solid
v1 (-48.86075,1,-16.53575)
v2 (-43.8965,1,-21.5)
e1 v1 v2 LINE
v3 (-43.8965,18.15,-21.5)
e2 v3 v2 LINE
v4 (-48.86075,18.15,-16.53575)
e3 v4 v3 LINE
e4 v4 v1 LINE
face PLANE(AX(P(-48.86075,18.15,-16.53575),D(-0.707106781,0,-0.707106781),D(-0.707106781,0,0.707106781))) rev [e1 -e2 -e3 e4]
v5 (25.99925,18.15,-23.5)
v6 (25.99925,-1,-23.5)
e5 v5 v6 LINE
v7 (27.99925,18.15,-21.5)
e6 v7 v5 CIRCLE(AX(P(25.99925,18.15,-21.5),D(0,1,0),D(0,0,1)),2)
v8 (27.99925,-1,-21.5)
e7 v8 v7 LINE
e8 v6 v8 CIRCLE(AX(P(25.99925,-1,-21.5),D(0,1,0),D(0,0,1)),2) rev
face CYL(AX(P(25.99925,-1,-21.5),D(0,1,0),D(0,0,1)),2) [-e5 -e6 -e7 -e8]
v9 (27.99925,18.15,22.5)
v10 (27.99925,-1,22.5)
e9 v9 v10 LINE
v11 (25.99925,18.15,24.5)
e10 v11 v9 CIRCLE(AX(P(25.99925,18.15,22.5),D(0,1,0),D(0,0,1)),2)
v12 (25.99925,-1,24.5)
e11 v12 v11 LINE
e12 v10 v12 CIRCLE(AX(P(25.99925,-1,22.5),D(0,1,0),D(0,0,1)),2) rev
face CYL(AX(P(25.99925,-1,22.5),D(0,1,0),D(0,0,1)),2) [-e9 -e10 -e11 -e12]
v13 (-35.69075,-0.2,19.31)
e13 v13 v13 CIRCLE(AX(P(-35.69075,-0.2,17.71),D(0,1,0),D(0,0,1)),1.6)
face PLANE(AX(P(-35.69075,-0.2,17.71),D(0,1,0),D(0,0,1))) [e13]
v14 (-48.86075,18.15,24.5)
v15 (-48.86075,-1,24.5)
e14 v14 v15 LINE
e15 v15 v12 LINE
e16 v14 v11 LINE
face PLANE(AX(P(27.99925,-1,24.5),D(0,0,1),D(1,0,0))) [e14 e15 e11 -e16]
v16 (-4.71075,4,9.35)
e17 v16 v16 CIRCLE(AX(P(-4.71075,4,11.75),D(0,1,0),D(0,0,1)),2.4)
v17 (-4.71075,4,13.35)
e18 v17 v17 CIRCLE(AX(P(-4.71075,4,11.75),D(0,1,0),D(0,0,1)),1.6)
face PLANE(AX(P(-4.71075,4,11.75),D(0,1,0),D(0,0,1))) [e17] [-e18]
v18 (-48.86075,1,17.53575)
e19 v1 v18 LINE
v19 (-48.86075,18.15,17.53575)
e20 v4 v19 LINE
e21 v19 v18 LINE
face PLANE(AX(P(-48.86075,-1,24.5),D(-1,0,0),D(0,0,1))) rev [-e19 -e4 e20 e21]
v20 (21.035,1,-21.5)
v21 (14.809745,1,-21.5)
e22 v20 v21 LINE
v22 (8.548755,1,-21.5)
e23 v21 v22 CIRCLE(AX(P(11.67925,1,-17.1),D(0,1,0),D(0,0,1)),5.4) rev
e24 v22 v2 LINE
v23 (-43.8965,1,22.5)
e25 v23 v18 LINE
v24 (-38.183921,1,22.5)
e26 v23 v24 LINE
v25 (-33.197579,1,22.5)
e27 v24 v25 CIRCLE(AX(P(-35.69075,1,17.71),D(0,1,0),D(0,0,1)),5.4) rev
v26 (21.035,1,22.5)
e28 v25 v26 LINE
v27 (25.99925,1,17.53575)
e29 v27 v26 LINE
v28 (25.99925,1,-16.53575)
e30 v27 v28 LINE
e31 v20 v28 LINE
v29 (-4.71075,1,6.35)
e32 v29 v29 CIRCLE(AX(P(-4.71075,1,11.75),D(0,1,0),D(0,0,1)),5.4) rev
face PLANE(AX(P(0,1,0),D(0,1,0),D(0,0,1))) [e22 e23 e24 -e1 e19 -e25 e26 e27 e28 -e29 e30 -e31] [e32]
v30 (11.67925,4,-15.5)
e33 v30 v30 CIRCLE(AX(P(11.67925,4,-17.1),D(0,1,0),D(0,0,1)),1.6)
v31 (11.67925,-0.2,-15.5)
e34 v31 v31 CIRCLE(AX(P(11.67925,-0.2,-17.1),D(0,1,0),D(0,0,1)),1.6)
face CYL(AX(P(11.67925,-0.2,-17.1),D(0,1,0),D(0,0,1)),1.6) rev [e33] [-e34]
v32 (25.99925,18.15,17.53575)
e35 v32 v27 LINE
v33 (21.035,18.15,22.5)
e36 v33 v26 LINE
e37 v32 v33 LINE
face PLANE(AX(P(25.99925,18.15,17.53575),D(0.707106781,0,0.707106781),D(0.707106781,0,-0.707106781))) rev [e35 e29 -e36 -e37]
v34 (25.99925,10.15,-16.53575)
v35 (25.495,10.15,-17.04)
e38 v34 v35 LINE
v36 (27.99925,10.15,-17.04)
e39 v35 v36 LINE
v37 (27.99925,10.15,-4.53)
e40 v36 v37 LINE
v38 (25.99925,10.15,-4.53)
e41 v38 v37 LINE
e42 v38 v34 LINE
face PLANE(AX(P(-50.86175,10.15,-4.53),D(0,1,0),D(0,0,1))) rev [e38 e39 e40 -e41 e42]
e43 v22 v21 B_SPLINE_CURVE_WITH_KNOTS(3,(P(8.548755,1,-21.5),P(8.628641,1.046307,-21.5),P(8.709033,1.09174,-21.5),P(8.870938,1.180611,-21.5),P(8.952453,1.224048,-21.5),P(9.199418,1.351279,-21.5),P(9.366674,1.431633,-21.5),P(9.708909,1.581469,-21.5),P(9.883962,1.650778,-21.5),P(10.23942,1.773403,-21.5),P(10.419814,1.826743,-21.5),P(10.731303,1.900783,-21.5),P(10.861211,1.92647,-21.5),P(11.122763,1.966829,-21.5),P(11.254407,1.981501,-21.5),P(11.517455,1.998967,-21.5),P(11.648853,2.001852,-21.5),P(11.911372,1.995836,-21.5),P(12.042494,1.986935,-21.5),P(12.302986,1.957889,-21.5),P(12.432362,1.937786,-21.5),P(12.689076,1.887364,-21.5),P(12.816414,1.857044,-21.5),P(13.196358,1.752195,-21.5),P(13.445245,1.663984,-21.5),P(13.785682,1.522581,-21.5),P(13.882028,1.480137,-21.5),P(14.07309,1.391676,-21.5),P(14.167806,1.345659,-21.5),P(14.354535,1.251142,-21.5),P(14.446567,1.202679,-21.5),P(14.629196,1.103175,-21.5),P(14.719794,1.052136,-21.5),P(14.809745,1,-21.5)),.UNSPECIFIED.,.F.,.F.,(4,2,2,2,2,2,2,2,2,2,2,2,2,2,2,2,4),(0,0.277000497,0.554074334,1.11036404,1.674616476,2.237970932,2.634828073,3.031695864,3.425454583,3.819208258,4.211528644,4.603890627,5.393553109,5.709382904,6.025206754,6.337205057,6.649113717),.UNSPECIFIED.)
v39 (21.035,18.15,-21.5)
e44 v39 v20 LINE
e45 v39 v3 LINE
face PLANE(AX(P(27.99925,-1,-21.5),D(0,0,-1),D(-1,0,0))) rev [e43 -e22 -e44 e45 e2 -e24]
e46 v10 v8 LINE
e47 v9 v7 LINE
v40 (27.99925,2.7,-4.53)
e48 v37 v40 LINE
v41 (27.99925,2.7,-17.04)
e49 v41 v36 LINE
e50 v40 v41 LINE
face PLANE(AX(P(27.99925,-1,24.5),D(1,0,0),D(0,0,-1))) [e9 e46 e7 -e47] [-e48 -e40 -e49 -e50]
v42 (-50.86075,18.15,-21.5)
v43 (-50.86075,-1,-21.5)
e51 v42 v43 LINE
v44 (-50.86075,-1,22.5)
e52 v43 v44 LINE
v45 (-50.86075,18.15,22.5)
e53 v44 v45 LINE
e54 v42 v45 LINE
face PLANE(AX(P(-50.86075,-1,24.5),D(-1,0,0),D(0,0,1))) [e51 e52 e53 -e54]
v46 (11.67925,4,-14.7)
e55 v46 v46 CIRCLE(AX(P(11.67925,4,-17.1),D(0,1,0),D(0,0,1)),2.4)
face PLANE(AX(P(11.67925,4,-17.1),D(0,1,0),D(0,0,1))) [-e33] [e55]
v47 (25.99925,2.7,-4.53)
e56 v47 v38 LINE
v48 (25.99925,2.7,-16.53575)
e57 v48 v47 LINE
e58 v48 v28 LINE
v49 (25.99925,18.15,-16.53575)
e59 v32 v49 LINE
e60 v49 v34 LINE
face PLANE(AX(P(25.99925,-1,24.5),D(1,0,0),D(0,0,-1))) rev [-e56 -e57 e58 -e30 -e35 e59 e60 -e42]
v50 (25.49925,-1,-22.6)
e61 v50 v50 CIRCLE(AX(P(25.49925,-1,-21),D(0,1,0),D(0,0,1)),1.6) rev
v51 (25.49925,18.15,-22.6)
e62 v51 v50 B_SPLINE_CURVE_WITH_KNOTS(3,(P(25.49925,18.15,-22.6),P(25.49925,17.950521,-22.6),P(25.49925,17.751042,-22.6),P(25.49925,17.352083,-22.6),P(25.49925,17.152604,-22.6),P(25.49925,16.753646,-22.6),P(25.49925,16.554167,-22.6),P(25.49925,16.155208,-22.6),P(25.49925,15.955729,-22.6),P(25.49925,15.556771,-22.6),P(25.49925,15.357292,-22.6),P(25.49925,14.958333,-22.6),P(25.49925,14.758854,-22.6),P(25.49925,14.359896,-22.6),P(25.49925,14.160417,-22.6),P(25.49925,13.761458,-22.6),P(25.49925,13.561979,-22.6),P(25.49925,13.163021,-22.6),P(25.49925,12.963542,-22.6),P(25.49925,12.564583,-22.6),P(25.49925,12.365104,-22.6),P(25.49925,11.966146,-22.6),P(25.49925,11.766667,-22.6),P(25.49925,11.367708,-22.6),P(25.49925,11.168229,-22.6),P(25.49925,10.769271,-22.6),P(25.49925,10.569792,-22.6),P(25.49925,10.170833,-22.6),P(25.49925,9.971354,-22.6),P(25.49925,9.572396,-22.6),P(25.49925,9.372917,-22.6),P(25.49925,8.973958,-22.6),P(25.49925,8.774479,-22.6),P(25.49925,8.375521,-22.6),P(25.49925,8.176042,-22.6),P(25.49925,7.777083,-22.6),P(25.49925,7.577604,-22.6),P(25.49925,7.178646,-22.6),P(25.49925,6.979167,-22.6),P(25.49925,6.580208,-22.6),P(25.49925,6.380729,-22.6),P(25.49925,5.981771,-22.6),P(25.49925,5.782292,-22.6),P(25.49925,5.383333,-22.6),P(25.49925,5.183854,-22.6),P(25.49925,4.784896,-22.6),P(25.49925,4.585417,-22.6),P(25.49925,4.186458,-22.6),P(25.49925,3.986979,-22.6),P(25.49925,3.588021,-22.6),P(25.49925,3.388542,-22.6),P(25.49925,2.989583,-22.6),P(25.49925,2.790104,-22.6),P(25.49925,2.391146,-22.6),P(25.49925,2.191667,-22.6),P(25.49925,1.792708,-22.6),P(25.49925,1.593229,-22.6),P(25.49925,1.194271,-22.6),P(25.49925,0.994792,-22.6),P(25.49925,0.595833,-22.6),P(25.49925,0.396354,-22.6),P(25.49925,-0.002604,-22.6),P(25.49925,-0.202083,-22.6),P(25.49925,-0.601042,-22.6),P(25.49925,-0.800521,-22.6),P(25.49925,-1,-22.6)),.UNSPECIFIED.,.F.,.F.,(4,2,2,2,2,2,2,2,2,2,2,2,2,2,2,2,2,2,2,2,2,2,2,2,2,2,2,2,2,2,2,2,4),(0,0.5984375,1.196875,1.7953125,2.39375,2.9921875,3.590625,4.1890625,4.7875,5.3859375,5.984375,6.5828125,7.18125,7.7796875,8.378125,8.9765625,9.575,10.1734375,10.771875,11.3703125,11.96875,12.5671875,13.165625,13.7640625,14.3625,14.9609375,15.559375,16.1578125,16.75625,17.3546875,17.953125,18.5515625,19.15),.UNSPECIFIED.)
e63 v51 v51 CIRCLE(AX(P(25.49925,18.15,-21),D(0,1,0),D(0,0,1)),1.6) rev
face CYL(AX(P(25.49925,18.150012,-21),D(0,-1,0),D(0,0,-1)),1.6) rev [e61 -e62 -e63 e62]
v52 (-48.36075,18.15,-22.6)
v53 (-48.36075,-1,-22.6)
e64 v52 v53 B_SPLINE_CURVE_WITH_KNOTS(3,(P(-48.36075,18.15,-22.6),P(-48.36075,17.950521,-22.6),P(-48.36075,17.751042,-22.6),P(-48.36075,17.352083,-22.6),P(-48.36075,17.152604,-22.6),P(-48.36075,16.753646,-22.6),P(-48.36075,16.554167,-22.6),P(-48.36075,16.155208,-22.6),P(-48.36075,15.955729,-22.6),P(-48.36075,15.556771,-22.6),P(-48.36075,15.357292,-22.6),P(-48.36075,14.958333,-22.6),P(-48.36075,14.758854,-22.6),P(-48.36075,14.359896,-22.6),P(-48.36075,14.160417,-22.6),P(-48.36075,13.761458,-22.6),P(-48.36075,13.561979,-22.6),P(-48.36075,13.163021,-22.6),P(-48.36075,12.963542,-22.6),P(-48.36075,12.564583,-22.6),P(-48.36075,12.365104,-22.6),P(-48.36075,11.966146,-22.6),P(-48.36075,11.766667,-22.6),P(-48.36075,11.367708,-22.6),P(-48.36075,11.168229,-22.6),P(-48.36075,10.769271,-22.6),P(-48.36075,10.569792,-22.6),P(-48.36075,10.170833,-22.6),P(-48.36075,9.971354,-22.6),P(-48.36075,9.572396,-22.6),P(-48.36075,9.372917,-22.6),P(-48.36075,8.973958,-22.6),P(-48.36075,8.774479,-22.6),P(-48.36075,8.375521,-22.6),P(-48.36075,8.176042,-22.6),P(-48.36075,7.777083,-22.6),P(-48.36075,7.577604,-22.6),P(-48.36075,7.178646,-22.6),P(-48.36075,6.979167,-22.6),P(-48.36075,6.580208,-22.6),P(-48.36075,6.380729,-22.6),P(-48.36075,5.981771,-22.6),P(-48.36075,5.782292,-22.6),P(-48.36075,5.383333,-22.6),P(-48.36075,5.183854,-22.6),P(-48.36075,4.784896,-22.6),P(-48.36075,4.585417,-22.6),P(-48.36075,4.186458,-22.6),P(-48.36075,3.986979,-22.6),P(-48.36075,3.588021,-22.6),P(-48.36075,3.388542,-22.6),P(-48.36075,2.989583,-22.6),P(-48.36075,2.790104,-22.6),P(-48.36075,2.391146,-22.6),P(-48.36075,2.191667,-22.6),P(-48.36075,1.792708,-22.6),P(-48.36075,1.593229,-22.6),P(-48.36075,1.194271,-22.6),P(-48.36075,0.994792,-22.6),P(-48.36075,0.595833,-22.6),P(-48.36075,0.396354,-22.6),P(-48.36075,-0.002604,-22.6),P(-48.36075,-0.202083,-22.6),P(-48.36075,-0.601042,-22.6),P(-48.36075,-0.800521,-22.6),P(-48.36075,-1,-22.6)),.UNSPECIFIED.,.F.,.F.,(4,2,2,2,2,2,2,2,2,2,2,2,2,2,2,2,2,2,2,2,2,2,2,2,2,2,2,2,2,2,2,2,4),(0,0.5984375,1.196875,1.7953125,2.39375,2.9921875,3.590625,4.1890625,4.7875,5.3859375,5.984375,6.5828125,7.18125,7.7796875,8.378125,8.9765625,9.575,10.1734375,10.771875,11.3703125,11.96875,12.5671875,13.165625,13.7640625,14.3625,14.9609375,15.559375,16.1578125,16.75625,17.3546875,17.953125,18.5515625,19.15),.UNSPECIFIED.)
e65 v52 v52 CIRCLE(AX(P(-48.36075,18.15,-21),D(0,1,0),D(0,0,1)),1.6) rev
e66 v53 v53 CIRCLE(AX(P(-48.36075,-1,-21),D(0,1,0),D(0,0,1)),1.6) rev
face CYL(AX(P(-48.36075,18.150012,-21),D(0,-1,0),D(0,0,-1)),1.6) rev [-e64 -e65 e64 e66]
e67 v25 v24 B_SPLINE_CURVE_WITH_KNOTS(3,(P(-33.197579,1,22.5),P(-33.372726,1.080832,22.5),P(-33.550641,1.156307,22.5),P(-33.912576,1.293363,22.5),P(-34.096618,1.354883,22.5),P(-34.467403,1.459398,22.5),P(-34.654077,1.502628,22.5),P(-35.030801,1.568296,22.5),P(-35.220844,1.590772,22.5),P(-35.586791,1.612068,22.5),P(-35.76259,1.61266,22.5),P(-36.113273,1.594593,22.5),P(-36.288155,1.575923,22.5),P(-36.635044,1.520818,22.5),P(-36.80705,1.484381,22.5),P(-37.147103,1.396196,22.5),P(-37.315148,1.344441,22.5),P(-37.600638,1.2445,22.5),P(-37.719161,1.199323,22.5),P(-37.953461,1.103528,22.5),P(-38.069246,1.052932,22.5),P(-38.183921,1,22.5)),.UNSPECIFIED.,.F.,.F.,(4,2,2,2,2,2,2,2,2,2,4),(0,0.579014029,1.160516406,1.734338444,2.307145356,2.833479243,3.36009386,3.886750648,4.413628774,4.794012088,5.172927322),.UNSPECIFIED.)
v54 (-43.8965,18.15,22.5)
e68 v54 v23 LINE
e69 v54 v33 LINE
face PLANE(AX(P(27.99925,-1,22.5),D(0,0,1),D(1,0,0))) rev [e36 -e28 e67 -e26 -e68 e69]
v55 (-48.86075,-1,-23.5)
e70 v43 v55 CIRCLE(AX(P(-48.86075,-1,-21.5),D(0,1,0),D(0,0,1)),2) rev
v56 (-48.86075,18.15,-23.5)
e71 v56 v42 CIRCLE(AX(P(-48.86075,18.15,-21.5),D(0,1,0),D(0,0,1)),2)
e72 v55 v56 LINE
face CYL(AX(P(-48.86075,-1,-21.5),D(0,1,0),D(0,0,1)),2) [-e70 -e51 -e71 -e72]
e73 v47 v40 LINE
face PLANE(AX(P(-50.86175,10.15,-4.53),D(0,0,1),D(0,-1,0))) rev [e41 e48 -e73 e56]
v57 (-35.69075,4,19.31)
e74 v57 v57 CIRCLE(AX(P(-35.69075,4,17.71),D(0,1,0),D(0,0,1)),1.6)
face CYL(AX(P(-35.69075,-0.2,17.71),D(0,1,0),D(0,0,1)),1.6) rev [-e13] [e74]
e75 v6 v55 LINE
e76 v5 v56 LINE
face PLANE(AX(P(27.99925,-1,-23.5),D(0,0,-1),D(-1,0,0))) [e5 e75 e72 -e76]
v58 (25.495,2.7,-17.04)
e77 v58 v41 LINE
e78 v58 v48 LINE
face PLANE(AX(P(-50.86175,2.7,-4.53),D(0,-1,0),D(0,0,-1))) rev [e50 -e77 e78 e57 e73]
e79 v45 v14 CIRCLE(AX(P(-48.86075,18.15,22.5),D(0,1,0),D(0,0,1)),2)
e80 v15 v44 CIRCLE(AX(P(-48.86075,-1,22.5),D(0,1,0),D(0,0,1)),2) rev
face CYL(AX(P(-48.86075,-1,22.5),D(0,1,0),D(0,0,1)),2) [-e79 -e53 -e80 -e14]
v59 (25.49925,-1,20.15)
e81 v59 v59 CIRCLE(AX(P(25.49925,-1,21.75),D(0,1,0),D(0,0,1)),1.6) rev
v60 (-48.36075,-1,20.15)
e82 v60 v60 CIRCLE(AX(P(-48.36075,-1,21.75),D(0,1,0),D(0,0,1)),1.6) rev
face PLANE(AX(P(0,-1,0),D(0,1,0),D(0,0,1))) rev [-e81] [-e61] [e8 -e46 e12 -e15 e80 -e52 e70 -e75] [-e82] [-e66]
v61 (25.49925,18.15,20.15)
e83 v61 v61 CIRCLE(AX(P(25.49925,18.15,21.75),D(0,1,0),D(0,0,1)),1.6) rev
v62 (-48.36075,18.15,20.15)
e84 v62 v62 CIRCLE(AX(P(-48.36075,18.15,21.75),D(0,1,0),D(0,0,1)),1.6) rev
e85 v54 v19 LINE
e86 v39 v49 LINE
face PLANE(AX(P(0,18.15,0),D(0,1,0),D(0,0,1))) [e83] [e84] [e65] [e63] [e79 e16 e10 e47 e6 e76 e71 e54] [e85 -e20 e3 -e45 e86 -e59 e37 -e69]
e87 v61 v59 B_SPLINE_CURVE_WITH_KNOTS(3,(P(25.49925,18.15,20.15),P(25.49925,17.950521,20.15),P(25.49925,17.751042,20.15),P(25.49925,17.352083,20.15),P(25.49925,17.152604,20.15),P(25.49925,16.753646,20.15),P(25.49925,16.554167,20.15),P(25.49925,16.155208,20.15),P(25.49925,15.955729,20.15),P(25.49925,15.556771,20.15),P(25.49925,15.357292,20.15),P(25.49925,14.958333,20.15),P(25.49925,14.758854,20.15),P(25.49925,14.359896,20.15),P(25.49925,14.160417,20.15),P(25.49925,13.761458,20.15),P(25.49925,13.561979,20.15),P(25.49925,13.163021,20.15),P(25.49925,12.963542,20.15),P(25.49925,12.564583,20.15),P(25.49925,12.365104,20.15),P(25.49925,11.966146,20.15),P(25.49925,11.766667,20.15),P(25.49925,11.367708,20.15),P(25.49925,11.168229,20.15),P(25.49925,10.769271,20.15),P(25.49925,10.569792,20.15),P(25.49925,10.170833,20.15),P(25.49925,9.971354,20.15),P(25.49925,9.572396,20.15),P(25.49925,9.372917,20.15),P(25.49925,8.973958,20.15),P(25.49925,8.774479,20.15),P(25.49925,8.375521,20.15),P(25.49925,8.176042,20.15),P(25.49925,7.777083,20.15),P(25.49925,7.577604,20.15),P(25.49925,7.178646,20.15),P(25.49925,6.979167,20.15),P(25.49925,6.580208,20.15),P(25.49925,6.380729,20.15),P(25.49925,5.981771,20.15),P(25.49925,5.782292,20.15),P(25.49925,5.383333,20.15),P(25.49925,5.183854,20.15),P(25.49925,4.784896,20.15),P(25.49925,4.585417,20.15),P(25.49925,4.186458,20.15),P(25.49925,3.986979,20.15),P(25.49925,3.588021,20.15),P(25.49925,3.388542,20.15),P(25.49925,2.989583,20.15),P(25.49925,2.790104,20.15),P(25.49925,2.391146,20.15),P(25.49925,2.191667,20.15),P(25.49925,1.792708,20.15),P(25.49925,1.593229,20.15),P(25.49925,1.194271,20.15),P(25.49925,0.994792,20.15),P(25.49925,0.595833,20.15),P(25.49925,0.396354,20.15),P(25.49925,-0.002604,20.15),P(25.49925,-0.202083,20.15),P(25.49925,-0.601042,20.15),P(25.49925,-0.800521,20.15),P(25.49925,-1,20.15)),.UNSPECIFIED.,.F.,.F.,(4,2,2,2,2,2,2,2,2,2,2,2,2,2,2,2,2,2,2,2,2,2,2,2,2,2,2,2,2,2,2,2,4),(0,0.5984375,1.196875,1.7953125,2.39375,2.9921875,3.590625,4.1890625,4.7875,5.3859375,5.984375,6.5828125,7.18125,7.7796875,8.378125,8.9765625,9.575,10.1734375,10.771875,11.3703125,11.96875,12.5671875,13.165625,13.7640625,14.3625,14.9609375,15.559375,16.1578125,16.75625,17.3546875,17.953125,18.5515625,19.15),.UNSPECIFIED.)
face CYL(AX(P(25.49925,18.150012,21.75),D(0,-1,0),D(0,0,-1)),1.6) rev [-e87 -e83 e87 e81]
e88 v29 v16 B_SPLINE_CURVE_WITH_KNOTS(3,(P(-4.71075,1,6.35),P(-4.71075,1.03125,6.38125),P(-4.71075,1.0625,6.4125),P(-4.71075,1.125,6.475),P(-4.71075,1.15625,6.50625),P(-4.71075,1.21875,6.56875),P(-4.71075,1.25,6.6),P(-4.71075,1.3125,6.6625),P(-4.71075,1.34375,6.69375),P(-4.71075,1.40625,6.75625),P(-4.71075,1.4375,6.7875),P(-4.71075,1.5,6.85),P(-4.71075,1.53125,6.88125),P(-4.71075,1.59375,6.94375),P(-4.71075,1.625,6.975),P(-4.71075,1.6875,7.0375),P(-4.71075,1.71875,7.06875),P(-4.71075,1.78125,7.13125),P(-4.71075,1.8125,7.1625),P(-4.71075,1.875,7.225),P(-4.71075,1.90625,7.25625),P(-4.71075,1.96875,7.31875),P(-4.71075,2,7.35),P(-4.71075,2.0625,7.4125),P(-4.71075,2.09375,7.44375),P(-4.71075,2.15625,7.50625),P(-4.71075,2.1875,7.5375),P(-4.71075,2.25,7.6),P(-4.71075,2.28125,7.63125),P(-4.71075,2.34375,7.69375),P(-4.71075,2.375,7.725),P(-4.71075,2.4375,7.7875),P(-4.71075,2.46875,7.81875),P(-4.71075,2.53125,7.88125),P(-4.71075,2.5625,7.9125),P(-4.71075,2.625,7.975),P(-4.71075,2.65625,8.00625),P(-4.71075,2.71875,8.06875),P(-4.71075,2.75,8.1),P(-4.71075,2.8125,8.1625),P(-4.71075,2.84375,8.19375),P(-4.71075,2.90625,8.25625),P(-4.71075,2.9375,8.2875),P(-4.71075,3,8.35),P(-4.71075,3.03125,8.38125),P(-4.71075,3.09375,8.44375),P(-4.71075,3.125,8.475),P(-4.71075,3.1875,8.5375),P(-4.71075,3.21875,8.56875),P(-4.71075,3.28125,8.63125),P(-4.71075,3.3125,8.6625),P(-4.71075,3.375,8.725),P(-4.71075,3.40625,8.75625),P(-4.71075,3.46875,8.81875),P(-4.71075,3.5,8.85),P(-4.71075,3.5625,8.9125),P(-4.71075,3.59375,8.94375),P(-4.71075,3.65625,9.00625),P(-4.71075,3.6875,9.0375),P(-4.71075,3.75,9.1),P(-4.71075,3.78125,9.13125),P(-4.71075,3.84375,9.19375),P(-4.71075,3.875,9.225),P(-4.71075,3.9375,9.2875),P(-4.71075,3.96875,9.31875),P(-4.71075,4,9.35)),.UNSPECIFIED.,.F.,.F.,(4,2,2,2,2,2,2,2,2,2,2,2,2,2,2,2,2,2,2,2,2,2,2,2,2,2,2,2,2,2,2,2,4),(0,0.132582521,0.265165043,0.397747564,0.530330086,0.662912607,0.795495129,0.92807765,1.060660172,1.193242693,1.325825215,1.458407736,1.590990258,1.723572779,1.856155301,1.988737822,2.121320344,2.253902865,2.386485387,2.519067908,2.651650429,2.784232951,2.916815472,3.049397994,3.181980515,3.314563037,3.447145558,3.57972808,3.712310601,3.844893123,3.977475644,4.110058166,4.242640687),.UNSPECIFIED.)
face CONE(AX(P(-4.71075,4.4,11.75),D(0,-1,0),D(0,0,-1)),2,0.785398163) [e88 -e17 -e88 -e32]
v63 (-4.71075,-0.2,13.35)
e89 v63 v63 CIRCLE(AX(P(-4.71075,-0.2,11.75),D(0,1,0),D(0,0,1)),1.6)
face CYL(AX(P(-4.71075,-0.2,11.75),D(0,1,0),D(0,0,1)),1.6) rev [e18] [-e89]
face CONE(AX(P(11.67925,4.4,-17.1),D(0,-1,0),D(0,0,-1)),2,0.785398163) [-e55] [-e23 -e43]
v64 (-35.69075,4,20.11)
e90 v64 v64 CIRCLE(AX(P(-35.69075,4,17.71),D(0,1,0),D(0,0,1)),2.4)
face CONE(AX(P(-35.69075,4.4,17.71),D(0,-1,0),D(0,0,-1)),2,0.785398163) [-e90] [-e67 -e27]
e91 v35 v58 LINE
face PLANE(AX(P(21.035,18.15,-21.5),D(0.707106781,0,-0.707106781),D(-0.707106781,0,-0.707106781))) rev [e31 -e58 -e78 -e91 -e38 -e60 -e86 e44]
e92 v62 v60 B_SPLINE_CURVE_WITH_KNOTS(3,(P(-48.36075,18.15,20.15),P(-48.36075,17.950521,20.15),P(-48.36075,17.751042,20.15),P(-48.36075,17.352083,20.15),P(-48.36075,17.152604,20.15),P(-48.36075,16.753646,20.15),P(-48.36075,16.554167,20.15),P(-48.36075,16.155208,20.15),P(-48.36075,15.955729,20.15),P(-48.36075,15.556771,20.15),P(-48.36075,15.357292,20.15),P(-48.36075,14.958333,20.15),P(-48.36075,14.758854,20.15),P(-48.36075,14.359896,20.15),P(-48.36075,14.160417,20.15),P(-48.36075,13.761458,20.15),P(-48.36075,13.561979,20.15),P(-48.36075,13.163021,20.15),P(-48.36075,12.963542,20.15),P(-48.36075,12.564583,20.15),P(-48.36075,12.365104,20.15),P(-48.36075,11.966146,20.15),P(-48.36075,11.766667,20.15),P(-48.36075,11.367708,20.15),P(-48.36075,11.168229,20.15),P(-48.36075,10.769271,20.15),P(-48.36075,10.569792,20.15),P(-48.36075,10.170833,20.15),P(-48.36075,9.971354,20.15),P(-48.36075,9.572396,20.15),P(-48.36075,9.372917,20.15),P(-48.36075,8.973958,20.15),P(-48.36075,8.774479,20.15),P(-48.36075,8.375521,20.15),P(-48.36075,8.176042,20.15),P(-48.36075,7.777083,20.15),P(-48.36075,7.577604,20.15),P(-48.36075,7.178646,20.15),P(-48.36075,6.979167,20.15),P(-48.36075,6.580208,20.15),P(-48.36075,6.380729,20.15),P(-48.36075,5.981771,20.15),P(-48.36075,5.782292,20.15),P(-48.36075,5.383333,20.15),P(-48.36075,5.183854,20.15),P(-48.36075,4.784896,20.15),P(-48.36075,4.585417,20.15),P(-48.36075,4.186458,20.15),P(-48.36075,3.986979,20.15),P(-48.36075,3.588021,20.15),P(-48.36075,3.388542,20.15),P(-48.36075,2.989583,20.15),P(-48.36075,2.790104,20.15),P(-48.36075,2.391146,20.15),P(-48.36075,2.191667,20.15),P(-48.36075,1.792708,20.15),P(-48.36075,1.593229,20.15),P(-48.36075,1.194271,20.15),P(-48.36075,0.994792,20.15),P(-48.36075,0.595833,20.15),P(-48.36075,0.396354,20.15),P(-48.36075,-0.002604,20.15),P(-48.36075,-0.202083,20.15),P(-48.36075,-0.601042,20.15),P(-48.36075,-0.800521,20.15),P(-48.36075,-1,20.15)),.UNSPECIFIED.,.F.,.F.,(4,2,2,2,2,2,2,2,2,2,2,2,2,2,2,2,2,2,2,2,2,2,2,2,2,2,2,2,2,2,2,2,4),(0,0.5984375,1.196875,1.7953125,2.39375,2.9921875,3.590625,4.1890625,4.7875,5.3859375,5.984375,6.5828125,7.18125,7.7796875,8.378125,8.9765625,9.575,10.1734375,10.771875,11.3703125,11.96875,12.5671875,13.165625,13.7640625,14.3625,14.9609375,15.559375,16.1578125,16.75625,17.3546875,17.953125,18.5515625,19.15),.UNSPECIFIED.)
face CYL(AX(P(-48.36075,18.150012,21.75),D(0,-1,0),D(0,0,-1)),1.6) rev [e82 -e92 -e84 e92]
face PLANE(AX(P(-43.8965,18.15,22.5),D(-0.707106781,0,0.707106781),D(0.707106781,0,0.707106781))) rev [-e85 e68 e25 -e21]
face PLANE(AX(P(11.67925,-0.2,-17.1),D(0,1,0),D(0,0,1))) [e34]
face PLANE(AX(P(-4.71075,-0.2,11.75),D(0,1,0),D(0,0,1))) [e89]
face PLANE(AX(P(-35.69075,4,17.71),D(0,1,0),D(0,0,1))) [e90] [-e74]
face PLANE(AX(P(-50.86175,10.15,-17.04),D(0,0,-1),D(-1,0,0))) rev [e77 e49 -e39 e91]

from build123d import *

# Parameters (mm, degrees)
BOSS_EXTRUDE1_DEPTH      = 18.15
BOSS_EXTRUDE1_DEPTH_BACK = 1
SKETCH1_W                = 78.86
SKETCH1_H                = 48
SHELL1_T                 = -2
BOSS_EXTRUDE2_START      = 3
SKETCH4_R                = 2
BOSS_EXTRUDE2_DEPTH      = 4.4
CHAMFER2_SIZE            = 3.4
CHAMFER3_SIZE            = 3.4
CHAMFER4_SIZE            = 3.4
BOSS_EXTRUDE4_DEPTH      = 17.15
CUT_EXTRUDE4_DEPTH       = 60.613659429
CUT_EXTRUDE4_DEPTH_BACK  = 22
SKETCH14_R               = 1.6
FILLET1_R                = 2
CUT_EXTRUDE9_REACH       = 86.549
SKETCH17_W               = 12.51
SKETCH17_H               = 7.45
SKETCH21_R               = 1.6
CUT_EXTRUDE10_DEPTH      = 4.2


with BuildPart() as part:
    # Sketch1 → Boss-Extrude1 (new, two sides: drawn at the far end of the back side and taken through both)
    with BuildSketch(Plane(origin=(0, 0, 0), x_dir=(1, 0, 0), z_dir=(0, 1, 0)).offset(-BOSS_EXTRUDE1_DEPTH_BACK)):
        with Locations((-11.43075, -0.5)):
            Rectangle(SKETCH1_W, SKETCH1_H)
    extrude(amount=BOSS_EXTRUDE1_DEPTH + BOSS_EXTRUDE1_DEPTH_BACK)

    # Shell1
    shell1_openings = [part.faces().sort_by_distance(p)[0] for p in [
        (-11.43075, 18.15, 0.5),
    ]]
    offset(amount=SHELL1_T, openings=shell1_openings, kind=Kind.INTERSECTION)

    # Sketch4 → Boss-Extrude2 (add)
    with BuildSketch(Plane(origin=(0, 1, 0), x_dir=(1, 0, 0), z_dir=(0, 1, 0)).offset(BOSS_EXTRUDE2_START)):
        with Locations(Location((-35.69075, -17.71, 0), (0, 0, 270))):
            Circle(SKETCH4_R)
        with Locations(Location((-4.71075, -11.75, 0), (0, 0, 270))):
            Circle(SKETCH4_R)
        with Locations(Location((11.67925, 17.1, 0), (0, 0, 270))):
            Circle(SKETCH4_R)
    extrude(amount=-BOSS_EXTRUDE2_DEPTH)

    # Chamfer2
    # the kernel refuses this chamfer: 3.4 mm, written as the material it adds along each edge
    with BuildSketch(Plane(origin=(-4.71075, 1, 11.75), x_dir=(0, 0, 1), z_dir=(-1, 0, 0))) as chamfer2_piece_1_section:
        Polygon((2 + CHAMFER2_SIZE, 0), (2, CHAMFER2_SIZE), (2, 0), align=None)
    chamfer2_piece_1 = revolve(axis=Axis((-4.71075, 1, 11.75), (0, 1, 0)), mode=Mode.PRIVATE)
    chamfer2_piece_1 = split(chamfer2_piece_1, bisect_by=Plane(origin=(-4.71075, 4, 7.837068743), z_dir=(0, -1, 0)), keep=Keep.TOP, mode=Mode.PRIVATE)
    add(chamfer2_piece_1)

    # Chamfer3
    # the kernel refuses this chamfer: 3.4 mm, written as the material it adds along each edge
    with BuildSketch(Plane(origin=(11.67925, 1, -17.1), x_dir=(0, 0, 1), z_dir=(-1, 0, 0))) as chamfer3_piece_1_section:
        Polygon((2 + CHAMFER3_SIZE, 0), (2, CHAMFER3_SIZE), (2, 0), align=None)
    chamfer3_piece_1 = revolve(axis=Axis((11.67925, 1, -17.1), (0, 1, 0)), mode=Mode.PRIVATE)
    chamfer3_piece_1 = split(chamfer3_piece_1, bisect_by=Plane(origin=(11.67925, 4, -21.012931257), z_dir=(0, -1, 0)), keep=Keep.TOP, mode=Mode.PRIVATE)
    add(chamfer3_piece_1)

    # Chamfer4
    # the kernel refuses this chamfer: 3.4 mm, written as the material it adds along each edge
    with BuildSketch(Plane(origin=(-35.69075, 1, 17.71), x_dir=(0, 0, 1), z_dir=(-1, 0, 0))) as chamfer4_piece_1_section:
        Polygon((2 + CHAMFER4_SIZE, 0), (2, CHAMFER4_SIZE), (2, 0), align=None)
    chamfer4_piece_1 = revolve(axis=Axis((-35.69075, 1, 17.71), (0, 1, 0)), mode=Mode.PRIVATE)
    chamfer4_piece_1 = split(chamfer4_piece_1, bisect_by=Plane(origin=(-35.69075, 4, 13.797068743), z_dir=(0, -1, 0)), keep=Keep.TOP, mode=Mode.PRIVATE)
    add(chamfer4_piece_1)

    # Sketch9 → Boss-Extrude4 (add)
    with BuildSketch(Plane(origin=(0, 1, 0), x_dir=(1, 0, 0), z_dir=(0, 1, 0))):
        Polygon((-48.86075, 16.53575), (-43.8965, 21.5), (-48.86075, 21.5), align=None)
        Polygon((21.035, 21.5), (25.99925, 16.53575), (25.99925, 21.5), align=None)
        Polygon((25.99925, -17.53575), (21.035, -22.5), (25.99925, -22.5), align=None)
        Polygon((-43.8965, -22.5), (-48.86075, -17.53575), (-48.86075, -22.5), align=None)
    extrude(amount=BOSS_EXTRUDE4_DEPTH)

    # Sketch14 → Cut-Extrude4 (cut, two sides: drawn at the far end of the back side and taken through both)
    with BuildSketch(Plane(origin=(0, 18.15, 0), x_dir=(1, 0, 0), z_dir=(0, 1, 0)).offset(-CUT_EXTRUDE4_DEPTH_BACK)):
        with Locations(Location((-48.36075, 21, 0), (0, 0, 90))):
            Circle(SKETCH14_R)
        with Locations(Location((25.49925, 21, 0), (0, 0, 90))):
            Circle(SKETCH14_R)
        with Locations(Location((25.49925, -21.75, 0), (0, 0, 90))):
            Circle(SKETCH14_R)
        with Locations(Location((-48.36075, -21.75, 0), (0, 0, 90))):
            Circle(SKETCH14_R)
    extrude(amount=CUT_EXTRUDE4_DEPTH + CUT_EXTRUDE4_DEPTH_BACK, mode=Mode.SUBTRACT)

    # Fillet1
    fillet1_edges = [part.edges().sort_by_distance(p)[0] for p in [
        (-50.86075, 8.575, -23.5),
        (27.99925, 8.575, -23.5),
        (27.99925, 8.575, 24.5),
        (-50.86075, 8.575, 24.5),
    ]]
    fillet(fillet1_edges, radius=FILLET1_R)

    # Sketch17 → Cut-Extrude9 (cut, up to next)
    with BuildSketch(Plane(origin=(27.99925, 0, 0), x_dir=(0, 0, -1), z_dir=(1, 0, 0)), mode=Mode.PRIVATE) as cut_extrude9_sk1:
        with Locations((10.785, 6.425)):
            Rectangle(SKETCH17_W, SKETCH17_H)
    cut_extrude9_tool1 = extrude(cut_extrude9_sk1.sketch, amount=-CUT_EXTRUDE9_REACH, mode=Mode.PRIVATE) & part.part
    add(cut_extrude9_tool1.solids().sort_by_distance((27.99925, 6.425, -10.785))[0], mode=Mode.SUBTRACT)

    # Sketch21 → Cut-Extrude10 (cut)
    with BuildSketch(Plane(origin=(0, 4, 0), x_dir=(1, 0, 0), z_dir=(0, 1, 0))):
        with Locations(Location((11.67925, 17.1, 0), (0, 0, 270))):
            Circle(SKETCH21_R)
        with Locations(Location((-4.71075, -11.75, 0), (0, 0, 270))):
            Circle(SKETCH21_R)
        with Locations(Location((-35.69075, -17.71, 0), (0, 0, 270))):
            Circle(SKETCH21_R)
    extrude(amount=-CUT_EXTRUDE10_DEPTH, mode=Mode.SUBTRACT)


solid = part.part
